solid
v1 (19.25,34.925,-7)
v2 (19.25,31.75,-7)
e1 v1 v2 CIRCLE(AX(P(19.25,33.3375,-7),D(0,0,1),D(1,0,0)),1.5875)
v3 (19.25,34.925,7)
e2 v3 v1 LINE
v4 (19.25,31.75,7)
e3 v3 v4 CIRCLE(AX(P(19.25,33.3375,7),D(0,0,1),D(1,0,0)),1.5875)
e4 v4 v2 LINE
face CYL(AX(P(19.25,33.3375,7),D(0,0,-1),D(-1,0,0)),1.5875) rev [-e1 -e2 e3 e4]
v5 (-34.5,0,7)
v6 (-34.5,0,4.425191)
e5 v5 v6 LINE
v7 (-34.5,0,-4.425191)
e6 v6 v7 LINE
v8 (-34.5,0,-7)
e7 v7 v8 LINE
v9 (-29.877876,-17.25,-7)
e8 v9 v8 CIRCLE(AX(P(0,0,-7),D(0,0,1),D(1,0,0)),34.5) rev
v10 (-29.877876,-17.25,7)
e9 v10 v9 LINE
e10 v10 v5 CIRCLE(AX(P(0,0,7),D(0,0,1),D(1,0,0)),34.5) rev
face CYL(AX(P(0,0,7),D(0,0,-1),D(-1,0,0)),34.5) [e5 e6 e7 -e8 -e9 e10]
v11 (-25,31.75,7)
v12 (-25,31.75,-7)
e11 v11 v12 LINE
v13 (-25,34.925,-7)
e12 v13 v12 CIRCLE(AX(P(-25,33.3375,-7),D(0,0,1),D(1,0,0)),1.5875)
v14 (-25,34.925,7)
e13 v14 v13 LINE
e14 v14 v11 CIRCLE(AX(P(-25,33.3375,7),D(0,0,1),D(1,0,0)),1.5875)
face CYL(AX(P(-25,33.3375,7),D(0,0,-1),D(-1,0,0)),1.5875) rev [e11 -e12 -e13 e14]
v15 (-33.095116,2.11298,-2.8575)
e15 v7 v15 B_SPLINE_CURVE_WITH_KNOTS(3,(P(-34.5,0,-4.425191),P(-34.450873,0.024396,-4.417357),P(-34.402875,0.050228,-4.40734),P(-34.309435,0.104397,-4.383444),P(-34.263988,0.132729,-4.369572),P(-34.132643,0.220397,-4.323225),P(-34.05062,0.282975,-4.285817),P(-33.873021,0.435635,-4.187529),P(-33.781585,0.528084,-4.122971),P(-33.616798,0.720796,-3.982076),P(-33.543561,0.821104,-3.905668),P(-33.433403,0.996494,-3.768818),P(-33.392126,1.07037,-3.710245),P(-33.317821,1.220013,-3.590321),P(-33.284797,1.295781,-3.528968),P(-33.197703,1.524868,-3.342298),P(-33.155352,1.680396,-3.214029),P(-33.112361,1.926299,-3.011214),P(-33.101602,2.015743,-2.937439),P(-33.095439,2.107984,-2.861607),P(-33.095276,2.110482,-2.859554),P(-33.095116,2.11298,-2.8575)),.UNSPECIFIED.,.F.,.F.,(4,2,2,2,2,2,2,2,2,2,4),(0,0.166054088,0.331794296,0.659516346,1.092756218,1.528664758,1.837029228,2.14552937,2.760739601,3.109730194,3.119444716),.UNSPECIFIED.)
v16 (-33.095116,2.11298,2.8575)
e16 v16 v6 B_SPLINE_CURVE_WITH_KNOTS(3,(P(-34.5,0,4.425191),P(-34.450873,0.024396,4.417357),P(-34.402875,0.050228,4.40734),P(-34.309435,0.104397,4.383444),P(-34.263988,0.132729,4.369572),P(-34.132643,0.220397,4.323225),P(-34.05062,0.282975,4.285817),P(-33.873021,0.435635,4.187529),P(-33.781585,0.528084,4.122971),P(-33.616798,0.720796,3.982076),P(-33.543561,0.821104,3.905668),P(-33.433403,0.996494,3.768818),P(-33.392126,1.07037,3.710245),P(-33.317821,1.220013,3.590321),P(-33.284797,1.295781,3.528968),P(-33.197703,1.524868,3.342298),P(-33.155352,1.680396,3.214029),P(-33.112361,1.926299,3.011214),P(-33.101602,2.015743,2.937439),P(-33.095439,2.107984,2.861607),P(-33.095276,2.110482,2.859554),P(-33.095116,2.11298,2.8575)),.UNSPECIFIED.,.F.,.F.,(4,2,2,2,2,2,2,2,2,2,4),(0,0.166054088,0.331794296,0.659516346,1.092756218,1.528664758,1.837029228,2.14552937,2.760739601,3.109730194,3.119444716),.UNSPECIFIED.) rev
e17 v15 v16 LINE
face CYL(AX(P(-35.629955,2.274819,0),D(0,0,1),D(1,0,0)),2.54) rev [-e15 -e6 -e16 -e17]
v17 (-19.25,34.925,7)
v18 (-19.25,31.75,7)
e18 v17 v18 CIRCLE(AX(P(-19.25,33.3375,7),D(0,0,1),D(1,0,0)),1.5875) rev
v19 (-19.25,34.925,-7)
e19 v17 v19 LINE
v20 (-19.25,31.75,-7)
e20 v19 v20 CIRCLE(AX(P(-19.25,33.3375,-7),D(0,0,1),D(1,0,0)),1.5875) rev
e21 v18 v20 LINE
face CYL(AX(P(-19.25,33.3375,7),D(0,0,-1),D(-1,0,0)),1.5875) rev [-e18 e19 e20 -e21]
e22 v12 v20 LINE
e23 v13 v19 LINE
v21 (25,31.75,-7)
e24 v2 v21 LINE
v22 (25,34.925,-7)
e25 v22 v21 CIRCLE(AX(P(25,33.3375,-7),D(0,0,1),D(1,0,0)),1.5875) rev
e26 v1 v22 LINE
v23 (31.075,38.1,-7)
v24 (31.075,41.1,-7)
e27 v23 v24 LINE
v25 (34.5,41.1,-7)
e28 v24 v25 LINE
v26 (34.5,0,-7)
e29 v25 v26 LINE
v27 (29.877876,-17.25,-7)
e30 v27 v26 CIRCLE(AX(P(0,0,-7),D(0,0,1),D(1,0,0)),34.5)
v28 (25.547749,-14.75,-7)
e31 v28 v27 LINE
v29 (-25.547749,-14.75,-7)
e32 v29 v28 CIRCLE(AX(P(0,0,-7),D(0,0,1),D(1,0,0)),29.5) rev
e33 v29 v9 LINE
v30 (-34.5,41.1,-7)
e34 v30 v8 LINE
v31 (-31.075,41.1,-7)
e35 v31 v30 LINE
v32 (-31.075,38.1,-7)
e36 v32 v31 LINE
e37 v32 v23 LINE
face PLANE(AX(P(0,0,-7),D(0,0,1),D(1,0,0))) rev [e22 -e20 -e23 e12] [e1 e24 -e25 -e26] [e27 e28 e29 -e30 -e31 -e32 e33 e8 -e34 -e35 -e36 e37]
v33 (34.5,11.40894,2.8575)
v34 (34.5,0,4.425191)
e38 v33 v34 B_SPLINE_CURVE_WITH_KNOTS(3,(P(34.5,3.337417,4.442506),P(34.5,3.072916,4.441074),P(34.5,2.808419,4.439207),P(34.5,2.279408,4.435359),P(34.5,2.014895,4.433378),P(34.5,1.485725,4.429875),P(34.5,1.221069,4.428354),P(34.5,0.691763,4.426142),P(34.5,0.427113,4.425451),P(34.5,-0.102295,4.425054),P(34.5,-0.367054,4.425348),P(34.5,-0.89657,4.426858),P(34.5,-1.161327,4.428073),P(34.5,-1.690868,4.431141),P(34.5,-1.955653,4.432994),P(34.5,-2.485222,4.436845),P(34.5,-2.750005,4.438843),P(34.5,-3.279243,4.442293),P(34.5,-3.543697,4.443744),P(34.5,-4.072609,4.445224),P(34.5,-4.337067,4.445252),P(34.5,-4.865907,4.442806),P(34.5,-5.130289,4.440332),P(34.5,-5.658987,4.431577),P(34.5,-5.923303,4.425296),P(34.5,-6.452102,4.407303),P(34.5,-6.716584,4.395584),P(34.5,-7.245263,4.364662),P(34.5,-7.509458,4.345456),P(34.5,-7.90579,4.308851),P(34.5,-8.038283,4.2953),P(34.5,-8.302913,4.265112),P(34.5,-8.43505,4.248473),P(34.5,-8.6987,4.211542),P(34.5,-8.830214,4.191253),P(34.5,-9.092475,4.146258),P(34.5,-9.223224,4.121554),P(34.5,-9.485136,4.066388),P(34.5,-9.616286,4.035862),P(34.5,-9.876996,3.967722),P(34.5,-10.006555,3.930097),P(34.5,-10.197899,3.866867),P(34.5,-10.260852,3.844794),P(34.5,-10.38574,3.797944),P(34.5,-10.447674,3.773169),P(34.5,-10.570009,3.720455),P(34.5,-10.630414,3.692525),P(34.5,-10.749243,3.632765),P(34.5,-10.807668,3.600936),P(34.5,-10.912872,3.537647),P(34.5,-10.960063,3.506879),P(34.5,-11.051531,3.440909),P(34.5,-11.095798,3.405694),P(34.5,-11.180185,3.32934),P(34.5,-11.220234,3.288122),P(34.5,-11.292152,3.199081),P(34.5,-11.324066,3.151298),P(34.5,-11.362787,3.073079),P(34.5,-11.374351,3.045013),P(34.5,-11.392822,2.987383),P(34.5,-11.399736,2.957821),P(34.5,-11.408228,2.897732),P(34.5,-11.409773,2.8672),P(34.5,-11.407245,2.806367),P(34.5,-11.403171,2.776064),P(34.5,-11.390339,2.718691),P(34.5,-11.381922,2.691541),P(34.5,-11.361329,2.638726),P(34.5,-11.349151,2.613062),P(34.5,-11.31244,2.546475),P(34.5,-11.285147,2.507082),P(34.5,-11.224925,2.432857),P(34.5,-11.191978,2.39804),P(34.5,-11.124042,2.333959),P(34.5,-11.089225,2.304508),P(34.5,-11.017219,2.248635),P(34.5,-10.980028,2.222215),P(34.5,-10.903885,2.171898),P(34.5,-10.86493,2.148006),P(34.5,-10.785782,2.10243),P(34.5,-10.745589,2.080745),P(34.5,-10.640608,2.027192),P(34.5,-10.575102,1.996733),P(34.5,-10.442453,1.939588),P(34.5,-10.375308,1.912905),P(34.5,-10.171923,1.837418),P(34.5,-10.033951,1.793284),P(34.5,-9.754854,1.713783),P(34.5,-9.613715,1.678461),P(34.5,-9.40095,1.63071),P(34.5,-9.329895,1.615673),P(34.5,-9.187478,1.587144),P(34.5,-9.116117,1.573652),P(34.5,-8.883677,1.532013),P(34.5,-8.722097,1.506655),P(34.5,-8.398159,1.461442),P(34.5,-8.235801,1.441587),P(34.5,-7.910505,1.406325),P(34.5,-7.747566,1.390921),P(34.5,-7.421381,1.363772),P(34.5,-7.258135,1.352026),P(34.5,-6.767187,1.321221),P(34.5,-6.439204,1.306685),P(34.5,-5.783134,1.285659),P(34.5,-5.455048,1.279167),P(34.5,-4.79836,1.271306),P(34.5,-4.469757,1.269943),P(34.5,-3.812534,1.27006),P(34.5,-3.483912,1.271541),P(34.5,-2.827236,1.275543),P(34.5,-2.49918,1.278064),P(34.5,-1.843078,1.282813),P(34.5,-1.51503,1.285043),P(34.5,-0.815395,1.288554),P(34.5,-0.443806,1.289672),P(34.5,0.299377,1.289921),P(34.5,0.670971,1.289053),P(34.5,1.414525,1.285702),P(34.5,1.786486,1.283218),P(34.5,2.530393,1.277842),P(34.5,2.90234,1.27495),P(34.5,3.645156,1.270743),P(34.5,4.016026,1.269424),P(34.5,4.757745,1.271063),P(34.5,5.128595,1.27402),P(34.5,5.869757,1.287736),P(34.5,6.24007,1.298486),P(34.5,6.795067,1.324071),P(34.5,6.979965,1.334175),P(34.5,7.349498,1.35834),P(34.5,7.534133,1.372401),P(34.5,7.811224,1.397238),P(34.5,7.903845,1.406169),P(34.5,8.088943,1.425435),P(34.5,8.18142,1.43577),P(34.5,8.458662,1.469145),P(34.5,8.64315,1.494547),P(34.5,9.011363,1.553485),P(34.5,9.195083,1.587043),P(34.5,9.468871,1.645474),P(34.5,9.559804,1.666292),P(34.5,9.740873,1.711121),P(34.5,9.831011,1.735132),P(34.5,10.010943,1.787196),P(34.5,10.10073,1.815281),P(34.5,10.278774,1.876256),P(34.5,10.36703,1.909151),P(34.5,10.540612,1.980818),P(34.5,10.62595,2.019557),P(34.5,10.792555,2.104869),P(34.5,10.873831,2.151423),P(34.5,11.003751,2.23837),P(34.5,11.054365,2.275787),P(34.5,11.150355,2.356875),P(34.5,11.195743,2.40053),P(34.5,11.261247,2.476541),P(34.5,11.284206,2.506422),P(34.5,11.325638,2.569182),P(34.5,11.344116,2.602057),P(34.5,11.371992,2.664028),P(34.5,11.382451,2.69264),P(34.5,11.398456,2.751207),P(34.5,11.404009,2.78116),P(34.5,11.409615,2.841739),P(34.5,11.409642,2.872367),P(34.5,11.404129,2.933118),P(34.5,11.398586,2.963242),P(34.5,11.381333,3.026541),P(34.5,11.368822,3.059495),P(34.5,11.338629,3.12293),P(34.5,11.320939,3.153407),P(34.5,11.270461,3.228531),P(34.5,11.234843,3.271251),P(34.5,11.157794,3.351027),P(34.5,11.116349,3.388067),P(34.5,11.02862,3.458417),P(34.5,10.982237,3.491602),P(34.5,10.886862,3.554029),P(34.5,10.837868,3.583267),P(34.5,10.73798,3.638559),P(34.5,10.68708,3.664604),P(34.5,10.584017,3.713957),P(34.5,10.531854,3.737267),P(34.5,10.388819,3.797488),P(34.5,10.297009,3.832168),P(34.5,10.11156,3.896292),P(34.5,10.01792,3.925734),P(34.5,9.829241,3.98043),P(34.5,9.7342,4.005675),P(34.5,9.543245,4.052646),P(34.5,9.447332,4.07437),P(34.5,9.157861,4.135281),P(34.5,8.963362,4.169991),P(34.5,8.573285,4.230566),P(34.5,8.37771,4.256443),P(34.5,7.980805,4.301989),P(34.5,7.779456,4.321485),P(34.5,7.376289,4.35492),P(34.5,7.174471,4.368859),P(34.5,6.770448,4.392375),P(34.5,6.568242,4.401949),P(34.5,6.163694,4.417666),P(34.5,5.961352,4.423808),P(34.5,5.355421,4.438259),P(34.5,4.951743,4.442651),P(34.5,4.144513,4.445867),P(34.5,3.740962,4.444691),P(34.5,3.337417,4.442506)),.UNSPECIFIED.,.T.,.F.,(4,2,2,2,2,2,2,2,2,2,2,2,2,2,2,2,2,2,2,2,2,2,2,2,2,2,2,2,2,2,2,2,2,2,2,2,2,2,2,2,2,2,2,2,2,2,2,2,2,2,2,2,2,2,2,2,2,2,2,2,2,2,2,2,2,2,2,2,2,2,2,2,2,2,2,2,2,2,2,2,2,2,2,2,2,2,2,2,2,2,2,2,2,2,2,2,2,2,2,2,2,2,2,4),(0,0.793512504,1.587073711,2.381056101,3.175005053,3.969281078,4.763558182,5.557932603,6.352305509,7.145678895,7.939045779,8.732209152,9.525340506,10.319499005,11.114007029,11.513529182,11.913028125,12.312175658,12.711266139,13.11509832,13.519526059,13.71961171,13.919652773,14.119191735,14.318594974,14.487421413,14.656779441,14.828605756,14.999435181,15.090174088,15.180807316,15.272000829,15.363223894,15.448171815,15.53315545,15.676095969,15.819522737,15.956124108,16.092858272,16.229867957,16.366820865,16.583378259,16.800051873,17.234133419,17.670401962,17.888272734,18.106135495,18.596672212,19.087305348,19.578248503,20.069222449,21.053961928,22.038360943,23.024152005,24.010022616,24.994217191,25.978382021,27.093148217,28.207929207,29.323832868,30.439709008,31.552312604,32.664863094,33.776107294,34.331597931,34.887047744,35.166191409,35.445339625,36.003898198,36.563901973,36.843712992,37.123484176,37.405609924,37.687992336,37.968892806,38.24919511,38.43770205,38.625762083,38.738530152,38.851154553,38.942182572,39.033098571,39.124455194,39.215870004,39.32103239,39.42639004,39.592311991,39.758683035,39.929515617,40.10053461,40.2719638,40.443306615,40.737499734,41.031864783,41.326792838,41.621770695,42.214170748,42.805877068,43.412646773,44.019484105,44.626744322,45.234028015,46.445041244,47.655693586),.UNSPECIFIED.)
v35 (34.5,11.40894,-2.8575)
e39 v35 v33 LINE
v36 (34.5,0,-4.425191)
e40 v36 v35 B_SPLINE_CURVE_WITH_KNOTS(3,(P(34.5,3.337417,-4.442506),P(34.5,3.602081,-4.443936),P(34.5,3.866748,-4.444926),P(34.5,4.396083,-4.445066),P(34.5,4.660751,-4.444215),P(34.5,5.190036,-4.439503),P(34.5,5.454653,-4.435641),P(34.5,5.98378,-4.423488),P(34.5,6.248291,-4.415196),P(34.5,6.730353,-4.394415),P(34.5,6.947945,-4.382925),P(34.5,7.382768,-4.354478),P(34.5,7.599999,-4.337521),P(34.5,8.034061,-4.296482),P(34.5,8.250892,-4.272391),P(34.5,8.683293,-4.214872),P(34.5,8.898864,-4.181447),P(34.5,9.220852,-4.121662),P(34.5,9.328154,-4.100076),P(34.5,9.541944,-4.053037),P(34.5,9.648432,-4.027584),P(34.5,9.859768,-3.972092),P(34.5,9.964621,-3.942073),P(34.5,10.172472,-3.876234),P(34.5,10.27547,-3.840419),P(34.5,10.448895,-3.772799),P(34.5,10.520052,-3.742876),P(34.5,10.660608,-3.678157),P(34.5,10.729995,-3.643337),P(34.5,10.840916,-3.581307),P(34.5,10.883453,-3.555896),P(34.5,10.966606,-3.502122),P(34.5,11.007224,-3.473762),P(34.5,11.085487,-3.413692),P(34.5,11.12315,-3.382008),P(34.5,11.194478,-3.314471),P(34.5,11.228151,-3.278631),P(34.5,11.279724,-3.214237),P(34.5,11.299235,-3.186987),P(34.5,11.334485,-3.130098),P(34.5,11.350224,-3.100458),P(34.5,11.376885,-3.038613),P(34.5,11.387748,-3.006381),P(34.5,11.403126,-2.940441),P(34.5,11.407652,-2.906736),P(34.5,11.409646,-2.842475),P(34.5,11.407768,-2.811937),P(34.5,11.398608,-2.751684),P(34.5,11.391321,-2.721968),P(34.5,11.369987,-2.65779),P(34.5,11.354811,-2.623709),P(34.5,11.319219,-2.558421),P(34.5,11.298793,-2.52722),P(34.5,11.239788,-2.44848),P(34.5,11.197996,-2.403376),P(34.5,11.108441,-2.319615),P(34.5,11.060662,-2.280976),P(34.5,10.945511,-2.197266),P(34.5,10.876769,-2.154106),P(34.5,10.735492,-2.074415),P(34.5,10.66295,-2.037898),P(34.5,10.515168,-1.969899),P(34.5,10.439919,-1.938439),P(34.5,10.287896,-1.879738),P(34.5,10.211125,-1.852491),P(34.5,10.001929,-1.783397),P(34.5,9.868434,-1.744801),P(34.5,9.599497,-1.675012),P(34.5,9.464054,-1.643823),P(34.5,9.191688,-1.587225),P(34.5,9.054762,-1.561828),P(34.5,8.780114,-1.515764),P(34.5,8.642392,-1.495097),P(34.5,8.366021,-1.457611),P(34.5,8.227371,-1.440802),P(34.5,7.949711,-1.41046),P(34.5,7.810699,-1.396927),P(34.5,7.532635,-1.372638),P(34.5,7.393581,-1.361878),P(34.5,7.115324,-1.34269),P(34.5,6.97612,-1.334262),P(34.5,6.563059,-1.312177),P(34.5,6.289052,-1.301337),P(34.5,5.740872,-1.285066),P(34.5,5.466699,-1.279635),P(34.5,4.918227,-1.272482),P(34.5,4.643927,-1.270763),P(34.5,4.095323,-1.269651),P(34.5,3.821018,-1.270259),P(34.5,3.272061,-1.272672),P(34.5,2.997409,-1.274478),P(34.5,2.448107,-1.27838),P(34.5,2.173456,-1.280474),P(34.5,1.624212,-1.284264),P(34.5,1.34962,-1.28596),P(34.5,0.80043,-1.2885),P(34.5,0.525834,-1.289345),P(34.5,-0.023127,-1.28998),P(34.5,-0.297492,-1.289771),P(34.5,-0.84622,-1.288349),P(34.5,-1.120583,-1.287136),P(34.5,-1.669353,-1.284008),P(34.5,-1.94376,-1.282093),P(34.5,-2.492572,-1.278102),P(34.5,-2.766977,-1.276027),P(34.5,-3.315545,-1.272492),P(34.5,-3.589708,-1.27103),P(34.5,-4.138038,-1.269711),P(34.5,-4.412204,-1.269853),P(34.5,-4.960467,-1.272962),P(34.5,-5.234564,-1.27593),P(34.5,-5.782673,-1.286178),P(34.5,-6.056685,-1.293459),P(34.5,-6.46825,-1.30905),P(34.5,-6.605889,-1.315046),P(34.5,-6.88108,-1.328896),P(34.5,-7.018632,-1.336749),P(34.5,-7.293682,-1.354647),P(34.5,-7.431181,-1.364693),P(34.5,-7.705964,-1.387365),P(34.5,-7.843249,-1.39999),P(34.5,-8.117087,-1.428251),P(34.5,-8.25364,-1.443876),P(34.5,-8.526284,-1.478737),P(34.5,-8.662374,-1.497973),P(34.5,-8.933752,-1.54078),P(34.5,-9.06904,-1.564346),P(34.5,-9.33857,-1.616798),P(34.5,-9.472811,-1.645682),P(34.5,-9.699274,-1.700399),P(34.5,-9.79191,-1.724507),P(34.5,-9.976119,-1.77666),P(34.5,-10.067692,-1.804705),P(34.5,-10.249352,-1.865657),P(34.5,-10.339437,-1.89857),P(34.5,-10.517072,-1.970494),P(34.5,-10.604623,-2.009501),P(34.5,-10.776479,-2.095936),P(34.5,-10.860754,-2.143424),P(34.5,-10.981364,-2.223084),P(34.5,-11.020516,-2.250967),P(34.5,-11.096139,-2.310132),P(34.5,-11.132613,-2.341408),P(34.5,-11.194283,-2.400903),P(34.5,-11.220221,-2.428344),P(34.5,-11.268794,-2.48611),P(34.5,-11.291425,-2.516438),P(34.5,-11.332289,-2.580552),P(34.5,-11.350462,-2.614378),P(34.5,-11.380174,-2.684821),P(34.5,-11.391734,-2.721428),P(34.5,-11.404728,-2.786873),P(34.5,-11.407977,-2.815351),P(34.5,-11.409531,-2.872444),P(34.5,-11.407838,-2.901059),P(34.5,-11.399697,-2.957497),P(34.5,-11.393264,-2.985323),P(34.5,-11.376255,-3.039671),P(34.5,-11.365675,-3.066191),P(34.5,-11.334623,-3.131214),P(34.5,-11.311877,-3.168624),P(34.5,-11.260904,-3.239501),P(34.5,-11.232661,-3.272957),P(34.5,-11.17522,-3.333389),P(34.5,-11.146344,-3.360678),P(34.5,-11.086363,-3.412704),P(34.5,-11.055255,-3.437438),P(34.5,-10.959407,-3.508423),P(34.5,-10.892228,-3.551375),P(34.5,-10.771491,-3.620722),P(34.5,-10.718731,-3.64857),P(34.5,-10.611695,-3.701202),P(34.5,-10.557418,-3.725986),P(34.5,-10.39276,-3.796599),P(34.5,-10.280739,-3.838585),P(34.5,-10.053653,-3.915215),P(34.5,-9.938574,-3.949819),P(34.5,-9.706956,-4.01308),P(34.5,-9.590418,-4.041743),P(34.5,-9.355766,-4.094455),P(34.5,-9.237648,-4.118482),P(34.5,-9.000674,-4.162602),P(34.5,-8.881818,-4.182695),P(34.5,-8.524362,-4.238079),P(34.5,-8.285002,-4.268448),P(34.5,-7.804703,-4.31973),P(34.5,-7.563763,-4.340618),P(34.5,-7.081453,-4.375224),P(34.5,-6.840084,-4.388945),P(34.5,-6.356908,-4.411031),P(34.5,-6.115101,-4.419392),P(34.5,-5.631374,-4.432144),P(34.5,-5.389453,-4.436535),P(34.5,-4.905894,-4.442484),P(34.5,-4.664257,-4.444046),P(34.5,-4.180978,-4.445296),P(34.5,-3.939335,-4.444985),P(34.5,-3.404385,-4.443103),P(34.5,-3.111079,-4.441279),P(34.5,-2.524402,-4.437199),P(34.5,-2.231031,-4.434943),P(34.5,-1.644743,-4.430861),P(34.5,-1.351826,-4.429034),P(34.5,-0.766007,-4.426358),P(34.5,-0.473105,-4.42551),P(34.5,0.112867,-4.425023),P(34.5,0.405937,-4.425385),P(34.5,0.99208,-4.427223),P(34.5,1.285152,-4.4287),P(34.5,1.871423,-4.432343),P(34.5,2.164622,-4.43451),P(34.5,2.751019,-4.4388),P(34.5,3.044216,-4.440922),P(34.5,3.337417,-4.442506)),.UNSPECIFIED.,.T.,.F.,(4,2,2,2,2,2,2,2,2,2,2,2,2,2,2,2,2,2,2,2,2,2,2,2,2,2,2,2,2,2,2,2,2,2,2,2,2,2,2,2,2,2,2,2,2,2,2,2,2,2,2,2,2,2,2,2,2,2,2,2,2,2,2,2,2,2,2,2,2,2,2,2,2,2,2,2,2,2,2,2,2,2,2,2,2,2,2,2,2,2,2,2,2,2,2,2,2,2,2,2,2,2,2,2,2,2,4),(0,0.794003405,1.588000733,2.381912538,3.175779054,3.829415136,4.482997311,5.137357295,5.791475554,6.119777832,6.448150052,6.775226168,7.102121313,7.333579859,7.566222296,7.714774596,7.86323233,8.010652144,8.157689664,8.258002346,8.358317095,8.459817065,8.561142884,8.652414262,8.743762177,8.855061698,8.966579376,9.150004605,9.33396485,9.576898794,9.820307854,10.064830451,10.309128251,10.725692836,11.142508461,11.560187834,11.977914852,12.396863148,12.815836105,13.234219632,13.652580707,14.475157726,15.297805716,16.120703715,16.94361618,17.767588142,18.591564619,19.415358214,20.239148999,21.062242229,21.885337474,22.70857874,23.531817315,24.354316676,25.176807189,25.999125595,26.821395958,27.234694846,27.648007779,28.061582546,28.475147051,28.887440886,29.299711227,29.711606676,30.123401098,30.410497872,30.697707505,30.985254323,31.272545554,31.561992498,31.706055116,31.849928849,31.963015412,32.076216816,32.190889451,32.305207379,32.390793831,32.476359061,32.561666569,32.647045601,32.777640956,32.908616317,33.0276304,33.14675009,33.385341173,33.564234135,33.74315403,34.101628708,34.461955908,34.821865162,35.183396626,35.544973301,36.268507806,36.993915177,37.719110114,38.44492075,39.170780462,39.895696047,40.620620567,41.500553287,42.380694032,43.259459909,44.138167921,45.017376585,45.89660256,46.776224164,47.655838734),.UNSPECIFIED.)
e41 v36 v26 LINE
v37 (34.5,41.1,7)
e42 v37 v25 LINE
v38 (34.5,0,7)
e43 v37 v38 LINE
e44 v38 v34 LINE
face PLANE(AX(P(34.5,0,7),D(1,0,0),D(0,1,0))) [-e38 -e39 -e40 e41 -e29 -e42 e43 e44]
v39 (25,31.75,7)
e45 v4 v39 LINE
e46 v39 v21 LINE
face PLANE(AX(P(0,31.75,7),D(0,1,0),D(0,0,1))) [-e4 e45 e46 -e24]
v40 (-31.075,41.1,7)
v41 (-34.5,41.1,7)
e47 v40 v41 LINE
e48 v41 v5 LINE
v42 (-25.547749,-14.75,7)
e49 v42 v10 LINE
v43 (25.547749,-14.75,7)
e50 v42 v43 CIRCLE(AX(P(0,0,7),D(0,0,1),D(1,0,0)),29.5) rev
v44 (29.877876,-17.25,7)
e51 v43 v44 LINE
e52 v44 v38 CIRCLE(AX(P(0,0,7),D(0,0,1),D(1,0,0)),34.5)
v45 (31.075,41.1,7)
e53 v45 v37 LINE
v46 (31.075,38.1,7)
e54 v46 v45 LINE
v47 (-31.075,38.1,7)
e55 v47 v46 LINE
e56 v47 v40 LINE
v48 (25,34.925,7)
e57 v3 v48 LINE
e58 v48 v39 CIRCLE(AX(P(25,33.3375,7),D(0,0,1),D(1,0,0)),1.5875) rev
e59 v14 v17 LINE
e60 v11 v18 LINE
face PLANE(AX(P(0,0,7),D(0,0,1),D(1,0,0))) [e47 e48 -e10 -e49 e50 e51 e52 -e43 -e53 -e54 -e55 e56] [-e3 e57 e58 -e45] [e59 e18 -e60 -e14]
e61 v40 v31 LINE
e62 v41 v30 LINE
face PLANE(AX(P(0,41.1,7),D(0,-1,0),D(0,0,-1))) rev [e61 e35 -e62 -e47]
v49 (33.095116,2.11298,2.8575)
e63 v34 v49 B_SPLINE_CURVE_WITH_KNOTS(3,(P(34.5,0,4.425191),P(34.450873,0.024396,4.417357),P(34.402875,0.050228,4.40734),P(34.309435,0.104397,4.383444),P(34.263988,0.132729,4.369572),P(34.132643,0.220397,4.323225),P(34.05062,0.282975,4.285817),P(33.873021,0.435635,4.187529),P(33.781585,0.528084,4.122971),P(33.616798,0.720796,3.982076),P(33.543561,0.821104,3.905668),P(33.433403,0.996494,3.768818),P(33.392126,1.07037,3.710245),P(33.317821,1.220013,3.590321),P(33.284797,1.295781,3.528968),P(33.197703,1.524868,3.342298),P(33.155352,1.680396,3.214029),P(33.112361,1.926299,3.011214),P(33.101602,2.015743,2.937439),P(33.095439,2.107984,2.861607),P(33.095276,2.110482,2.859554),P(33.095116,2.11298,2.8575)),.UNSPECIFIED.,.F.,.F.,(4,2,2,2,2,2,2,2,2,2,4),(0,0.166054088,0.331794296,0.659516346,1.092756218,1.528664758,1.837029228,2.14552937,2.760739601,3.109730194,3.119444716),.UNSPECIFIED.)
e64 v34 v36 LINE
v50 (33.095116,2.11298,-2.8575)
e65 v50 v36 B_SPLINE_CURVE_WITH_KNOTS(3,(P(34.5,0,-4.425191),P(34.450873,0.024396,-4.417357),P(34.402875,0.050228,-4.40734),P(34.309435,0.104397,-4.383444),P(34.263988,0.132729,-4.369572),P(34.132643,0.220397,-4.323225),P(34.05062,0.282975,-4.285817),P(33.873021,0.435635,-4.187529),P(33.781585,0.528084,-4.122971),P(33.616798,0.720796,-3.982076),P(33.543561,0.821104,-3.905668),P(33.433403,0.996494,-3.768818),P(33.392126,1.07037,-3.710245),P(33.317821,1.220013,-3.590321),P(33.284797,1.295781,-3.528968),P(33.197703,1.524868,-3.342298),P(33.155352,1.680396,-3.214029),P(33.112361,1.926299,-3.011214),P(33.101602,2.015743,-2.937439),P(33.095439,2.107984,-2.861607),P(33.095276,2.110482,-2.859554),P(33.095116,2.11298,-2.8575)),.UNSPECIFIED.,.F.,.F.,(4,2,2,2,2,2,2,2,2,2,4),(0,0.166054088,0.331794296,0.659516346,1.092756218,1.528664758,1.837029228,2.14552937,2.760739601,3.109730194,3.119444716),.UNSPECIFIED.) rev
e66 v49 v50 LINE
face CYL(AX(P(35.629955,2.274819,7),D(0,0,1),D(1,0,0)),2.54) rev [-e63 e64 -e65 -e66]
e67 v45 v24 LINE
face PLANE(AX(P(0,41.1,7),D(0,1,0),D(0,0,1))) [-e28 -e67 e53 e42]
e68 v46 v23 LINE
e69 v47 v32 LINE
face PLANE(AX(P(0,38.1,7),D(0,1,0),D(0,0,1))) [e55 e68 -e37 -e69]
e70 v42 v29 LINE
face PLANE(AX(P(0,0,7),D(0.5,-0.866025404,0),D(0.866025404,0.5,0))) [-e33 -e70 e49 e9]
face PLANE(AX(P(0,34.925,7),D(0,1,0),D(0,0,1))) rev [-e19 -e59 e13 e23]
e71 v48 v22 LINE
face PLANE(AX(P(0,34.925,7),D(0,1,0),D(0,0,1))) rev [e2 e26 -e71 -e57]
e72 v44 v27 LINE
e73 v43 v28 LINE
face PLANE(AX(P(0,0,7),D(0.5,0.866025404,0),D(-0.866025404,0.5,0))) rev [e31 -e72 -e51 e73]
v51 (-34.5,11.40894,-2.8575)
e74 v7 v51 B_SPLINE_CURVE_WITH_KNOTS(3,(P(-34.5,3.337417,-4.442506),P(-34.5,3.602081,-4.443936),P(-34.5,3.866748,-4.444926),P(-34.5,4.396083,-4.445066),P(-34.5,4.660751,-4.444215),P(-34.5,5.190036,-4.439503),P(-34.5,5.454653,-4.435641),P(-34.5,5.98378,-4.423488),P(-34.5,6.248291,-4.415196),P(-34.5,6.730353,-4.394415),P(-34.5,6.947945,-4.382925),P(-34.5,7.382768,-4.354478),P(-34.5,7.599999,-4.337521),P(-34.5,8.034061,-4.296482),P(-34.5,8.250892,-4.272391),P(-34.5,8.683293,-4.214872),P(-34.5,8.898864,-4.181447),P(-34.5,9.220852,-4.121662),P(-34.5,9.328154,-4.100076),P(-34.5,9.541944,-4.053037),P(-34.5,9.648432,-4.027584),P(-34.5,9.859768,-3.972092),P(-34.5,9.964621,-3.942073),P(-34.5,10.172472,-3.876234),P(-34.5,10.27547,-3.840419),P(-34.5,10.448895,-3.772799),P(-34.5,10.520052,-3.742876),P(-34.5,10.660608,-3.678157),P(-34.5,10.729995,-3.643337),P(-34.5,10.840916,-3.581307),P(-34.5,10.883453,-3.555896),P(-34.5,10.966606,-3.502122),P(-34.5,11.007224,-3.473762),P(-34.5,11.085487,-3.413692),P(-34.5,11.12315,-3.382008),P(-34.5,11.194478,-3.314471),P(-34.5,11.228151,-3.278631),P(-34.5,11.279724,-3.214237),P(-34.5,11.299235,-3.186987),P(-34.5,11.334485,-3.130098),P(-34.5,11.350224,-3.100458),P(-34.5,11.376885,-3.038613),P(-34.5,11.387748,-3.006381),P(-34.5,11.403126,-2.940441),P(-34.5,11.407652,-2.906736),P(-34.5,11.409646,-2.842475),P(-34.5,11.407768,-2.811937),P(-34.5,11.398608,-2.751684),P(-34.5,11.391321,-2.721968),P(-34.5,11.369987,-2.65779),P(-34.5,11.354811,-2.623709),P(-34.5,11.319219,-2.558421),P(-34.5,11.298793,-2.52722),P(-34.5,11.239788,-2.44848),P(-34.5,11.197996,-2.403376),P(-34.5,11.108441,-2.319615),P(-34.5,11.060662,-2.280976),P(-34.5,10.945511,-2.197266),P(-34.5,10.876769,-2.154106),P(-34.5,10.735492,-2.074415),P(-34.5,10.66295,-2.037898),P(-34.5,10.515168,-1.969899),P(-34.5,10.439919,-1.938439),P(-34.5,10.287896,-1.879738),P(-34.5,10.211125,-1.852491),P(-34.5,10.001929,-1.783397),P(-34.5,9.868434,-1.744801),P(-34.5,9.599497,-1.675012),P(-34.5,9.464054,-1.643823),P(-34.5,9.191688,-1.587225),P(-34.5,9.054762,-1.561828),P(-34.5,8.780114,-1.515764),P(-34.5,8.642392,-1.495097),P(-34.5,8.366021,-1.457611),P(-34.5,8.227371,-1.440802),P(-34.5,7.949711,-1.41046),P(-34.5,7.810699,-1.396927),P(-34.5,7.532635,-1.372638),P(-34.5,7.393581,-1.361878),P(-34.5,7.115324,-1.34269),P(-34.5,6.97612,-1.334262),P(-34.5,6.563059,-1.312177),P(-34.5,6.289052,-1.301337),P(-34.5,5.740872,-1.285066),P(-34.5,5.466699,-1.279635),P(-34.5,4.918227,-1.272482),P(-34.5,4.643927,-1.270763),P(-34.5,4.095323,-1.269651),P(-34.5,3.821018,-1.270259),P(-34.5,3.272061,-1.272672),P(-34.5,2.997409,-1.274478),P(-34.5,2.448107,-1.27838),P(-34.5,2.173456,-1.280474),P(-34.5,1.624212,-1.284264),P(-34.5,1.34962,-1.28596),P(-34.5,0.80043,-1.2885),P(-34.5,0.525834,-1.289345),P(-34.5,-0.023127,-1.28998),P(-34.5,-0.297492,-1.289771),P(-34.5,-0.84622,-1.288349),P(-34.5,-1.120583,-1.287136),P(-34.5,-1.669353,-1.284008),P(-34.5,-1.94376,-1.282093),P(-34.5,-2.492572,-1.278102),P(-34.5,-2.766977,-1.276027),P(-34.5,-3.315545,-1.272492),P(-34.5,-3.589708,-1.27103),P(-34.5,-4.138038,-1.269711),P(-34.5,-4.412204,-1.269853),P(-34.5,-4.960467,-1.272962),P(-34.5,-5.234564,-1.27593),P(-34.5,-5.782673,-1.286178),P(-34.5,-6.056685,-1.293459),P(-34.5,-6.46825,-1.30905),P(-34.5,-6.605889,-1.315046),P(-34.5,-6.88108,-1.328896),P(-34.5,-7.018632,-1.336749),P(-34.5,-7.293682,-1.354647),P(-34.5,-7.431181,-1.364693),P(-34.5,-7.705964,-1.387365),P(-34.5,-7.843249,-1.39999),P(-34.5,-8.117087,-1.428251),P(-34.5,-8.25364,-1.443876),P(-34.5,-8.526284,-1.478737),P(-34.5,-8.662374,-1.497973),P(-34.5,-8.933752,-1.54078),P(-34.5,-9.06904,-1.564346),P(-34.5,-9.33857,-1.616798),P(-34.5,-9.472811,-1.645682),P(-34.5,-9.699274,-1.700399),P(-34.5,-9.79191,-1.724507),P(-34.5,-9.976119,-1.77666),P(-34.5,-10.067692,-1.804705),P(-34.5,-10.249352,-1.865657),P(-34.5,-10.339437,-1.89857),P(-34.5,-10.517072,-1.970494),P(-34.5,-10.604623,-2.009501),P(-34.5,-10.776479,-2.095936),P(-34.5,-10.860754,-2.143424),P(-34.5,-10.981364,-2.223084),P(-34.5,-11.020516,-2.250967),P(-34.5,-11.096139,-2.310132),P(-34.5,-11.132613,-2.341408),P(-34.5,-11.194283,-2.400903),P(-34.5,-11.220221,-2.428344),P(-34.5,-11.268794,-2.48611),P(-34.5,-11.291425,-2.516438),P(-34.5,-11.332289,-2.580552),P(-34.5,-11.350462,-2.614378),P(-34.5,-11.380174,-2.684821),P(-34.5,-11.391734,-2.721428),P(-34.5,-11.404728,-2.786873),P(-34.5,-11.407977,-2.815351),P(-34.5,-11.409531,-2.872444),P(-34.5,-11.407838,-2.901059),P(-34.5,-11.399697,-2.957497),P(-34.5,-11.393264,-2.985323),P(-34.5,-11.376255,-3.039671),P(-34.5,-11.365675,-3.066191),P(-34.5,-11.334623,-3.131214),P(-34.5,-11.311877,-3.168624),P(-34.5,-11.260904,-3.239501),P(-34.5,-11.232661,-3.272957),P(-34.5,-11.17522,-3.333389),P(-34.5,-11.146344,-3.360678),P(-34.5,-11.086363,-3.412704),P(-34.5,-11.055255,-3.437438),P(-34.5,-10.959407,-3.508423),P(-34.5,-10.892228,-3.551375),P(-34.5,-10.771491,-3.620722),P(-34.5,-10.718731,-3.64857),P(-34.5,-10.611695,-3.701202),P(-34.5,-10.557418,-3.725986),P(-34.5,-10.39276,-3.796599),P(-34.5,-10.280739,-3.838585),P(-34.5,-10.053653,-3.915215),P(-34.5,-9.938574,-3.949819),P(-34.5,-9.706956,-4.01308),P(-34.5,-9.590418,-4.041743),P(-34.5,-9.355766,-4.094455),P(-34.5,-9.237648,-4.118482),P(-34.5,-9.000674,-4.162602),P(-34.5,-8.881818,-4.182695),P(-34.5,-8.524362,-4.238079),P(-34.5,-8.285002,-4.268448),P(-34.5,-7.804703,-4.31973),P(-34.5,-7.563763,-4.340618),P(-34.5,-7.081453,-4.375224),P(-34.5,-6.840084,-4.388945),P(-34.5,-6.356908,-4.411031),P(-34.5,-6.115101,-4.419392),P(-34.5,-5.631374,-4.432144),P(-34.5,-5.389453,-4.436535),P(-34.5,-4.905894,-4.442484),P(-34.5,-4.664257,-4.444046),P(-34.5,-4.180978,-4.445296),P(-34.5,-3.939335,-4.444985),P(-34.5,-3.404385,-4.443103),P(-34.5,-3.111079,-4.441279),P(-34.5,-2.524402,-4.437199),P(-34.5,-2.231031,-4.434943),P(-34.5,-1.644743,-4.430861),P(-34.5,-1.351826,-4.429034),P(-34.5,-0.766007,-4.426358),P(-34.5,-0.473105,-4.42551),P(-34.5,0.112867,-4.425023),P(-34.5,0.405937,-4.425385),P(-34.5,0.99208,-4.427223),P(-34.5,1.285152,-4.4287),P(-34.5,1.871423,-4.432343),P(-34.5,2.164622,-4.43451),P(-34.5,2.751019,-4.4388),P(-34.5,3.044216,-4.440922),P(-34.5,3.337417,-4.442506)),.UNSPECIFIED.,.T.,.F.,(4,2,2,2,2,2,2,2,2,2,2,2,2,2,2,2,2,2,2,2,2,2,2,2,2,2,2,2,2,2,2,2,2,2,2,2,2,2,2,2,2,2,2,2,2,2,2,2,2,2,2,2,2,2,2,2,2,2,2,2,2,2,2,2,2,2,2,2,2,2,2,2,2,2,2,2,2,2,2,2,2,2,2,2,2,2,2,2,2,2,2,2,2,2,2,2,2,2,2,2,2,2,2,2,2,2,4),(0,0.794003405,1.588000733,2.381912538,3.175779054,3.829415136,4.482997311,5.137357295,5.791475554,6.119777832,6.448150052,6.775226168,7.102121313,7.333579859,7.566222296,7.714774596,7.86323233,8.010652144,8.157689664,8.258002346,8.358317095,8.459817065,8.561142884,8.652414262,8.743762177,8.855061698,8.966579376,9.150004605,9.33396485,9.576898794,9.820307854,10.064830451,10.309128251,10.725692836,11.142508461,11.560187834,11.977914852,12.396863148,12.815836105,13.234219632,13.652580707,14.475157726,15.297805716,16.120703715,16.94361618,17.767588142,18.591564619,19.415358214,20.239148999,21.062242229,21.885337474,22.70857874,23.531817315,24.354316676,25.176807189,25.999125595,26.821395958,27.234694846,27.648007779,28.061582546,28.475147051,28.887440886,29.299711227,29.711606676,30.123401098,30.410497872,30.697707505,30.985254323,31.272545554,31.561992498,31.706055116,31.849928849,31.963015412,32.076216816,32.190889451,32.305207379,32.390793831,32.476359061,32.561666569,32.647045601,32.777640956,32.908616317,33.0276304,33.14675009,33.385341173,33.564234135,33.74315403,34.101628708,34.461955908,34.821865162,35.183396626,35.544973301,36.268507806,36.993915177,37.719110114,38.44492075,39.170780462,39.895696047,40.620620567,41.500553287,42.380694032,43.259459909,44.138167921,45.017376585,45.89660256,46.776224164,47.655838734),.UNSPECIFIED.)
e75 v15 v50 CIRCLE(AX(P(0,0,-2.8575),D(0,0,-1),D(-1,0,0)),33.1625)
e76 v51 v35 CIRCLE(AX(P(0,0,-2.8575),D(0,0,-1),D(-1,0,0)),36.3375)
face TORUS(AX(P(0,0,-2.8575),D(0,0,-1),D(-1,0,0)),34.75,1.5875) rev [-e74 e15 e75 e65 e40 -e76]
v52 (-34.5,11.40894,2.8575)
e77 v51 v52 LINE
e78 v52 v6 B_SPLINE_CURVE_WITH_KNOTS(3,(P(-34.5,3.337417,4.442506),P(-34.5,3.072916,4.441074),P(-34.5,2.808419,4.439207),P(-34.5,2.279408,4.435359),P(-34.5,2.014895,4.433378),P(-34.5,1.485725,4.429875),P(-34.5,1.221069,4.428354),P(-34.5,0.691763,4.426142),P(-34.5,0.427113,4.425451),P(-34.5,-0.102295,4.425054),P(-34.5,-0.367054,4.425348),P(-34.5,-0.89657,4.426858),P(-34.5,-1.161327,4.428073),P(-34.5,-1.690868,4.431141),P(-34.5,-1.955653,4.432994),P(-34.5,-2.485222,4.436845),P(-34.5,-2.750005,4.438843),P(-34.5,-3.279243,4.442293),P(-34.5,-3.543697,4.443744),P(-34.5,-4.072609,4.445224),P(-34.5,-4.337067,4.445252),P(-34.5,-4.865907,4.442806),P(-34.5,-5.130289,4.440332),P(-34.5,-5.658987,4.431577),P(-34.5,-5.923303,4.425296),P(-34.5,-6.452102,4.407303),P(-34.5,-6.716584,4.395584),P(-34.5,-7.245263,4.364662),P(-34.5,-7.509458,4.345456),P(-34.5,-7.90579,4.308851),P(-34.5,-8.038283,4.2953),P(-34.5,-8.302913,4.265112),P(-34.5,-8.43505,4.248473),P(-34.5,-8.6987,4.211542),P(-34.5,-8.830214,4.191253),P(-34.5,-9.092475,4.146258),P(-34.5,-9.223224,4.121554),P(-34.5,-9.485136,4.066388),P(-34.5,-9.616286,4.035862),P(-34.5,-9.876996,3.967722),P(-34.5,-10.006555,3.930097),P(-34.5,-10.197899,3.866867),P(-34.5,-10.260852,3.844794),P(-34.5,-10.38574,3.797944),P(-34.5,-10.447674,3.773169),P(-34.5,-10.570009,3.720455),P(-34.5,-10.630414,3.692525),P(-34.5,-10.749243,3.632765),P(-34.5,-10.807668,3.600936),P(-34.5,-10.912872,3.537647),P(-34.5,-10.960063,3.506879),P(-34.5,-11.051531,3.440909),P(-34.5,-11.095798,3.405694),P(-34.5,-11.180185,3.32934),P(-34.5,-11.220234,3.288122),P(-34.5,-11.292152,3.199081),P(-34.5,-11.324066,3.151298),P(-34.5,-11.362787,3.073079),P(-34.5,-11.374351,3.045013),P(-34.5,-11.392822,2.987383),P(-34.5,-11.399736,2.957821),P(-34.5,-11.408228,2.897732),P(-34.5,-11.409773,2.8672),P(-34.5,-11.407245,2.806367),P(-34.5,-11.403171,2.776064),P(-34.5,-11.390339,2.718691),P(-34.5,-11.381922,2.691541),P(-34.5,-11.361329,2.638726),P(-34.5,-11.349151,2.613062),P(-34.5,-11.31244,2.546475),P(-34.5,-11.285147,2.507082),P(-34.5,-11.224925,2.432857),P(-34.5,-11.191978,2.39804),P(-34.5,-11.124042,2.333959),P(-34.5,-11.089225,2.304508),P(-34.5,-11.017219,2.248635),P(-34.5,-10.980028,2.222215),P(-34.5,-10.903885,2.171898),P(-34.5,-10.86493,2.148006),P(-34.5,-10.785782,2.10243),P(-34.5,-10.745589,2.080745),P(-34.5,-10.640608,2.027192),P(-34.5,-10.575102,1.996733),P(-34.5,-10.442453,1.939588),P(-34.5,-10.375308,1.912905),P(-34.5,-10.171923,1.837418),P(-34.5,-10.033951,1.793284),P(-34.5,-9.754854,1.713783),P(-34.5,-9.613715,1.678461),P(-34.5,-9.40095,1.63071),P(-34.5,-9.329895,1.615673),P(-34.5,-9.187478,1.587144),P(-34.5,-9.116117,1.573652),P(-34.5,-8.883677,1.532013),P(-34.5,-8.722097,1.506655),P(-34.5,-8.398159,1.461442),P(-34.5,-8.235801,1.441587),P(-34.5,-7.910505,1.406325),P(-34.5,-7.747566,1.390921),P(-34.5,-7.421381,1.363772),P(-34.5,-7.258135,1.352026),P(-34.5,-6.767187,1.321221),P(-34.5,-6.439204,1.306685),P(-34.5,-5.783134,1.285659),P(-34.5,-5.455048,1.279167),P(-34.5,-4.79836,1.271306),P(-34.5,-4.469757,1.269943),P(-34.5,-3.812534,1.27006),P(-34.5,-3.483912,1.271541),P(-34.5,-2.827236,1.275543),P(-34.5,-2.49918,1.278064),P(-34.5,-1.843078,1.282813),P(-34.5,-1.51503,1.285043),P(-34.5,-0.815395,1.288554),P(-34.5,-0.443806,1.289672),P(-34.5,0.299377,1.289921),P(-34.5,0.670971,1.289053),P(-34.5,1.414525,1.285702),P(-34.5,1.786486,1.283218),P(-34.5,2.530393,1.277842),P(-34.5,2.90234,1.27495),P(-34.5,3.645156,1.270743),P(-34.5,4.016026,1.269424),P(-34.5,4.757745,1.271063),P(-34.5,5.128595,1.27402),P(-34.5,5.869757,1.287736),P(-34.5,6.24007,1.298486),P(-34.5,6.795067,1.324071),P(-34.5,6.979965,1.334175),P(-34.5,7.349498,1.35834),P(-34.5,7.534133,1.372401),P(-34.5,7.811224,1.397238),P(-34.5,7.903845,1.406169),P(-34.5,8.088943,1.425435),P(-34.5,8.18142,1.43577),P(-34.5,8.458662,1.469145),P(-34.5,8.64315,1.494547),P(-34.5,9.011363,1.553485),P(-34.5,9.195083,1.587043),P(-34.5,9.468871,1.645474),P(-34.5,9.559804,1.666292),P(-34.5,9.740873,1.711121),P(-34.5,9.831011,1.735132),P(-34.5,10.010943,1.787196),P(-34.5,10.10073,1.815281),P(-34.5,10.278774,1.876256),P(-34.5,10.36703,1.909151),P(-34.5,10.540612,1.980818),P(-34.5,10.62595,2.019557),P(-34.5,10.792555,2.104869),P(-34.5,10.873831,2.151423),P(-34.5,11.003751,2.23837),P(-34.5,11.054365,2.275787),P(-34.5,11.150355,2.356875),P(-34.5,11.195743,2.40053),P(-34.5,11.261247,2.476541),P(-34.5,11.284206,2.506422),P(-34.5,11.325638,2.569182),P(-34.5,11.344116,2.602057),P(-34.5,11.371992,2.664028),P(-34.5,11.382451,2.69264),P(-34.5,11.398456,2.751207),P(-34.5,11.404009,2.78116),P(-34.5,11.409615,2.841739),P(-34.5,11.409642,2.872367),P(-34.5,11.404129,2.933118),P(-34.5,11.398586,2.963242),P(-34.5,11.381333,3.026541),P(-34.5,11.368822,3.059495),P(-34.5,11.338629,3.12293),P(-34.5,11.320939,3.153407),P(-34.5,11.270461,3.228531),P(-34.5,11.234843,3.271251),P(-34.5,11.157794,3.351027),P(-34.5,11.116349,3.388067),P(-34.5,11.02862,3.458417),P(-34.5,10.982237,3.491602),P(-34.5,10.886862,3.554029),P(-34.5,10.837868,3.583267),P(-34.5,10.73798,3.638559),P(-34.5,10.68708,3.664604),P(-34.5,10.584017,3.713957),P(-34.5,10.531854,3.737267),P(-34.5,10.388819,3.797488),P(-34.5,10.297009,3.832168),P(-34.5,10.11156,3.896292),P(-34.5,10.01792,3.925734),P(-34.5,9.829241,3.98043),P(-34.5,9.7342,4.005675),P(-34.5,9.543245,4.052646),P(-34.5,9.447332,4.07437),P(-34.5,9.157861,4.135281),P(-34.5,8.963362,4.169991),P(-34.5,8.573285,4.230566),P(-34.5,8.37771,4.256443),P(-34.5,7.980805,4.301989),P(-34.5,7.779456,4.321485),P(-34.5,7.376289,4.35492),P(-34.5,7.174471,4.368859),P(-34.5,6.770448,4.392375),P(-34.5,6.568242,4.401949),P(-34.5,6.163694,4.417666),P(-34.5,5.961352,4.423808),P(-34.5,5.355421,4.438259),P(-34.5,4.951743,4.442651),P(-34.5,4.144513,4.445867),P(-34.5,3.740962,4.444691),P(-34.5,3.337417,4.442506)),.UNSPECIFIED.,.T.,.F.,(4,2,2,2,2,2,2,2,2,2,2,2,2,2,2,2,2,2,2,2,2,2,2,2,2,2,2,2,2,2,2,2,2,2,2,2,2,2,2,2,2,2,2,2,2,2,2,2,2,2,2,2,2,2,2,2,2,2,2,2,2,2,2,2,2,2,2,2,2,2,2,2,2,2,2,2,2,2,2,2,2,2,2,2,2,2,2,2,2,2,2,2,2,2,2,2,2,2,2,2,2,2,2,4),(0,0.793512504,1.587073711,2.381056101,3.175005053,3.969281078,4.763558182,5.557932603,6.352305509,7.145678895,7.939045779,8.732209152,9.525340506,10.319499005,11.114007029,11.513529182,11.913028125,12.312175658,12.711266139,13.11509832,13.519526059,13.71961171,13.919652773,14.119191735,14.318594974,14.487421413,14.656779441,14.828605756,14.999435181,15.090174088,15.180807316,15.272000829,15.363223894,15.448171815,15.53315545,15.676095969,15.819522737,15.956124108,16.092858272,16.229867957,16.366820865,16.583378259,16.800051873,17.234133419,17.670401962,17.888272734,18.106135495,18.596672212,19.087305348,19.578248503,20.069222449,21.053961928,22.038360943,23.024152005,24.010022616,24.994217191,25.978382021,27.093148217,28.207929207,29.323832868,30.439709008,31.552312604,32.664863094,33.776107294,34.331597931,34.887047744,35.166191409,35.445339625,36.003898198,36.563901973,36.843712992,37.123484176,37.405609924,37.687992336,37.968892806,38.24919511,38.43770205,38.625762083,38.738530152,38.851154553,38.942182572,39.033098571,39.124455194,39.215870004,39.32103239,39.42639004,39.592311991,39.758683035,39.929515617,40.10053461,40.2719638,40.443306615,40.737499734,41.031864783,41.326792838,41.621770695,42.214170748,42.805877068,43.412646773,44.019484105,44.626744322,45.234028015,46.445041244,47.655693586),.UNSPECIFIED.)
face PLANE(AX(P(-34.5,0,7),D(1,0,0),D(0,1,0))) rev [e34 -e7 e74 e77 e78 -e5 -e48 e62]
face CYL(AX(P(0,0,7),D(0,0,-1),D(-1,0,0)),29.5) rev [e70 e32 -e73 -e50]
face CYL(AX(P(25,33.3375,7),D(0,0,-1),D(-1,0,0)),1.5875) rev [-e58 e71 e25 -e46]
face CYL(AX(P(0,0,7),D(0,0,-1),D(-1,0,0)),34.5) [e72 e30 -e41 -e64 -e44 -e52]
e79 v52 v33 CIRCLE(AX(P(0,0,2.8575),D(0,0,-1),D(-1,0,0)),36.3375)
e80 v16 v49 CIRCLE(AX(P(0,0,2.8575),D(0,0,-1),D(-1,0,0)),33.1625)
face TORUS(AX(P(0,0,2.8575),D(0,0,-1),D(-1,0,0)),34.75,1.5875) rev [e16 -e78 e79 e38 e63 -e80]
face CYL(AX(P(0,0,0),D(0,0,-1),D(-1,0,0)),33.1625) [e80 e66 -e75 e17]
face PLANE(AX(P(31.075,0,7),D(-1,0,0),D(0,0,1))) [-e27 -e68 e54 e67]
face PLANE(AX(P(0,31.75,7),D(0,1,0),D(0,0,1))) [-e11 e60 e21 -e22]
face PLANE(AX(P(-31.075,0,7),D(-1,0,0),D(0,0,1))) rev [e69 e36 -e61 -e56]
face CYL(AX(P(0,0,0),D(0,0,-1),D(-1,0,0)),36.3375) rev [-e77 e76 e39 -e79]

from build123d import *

# Parameters (mm, degrees)
BOSS_EXTRUDE2_DEPTH      = 7
CORTAR_REVOLUCI_N1_ANGLE = 180
REDONDEO1_START          = -5
REDONDEO1_DEPTH          = 10


with BuildPart() as part:
    # Sketch1 → Boss-Extrude2 (new, symmetric)
    with BuildSketch(Plane.XY):
        with BuildLine():
            Line((25.547749412, -14.75), (29.877876431, -17.25))
            ThreePointArc((29.877876431, -17.25), (33.324441007, -8.929257056), (34.5, 0))
            Line((34.5, 0), (34.5, 41.1))
            Line((34.5, 41.1), (31.075, 41.1))
            Line((31.075, 41.1), (31.075, 38.1))
            Line((31.075, 38.1), (-31.075, 38.1))
            Line((-31.075, 38.1), (-31.075, 41.1))
            Line((-31.075, 41.1), (-34.5, 41.1))
            Line((-34.5, 41.1), (-34.5, 0))
            ThreePointArc((-34.5, 0), (-33.324441007, -8.929257056), (-29.877876431, -17.25))
            Line((-29.877876431, -17.25), (-25.547749412, -14.75))
            ThreePointArc((-25.547749412, -14.75), (0, 29.5), (25.547749412, -14.75))
        make_face()
        with BuildLine():
            Line((-25, 34.925), (-19.25, 34.925))
            ThreePointArc((-19.25, 34.925), (-17.6625, 33.3375), (-19.25, 31.75))
            Line((-19.25, 31.75), (-25, 31.75))
            ThreePointArc((-25, 31.75), (-26.5875, 33.3375), (-25, 34.925))
        make_face(mode=Mode.SUBTRACT)
        with BuildLine():
            Line((19.25, 34.925), (25, 34.925))
            ThreePointArc((25, 34.925), (26.5875, 33.3375), (25, 31.75))
            Line((25, 31.75), (19.25, 31.75))
            ThreePointArc((19.25, 31.75), (17.6625, 33.3375), (19.25, 34.925))
        make_face(mode=Mode.SUBTRACT)
    extrude(amount=BOSS_EXTRUDE2_DEPTH, both=True)

    # Croquis1 → Cortar-Revolución1 (revolve, symmetric, cut)
    with BuildSketch(Plane(origin=(0, 0, 0), x_dir=(0, 0, -1), z_dir=(1, 0, 0))) as cortar_revoluci_n1_sk:
        with BuildLine():
            Line((-2.8575, 36.3375), (2.8575, 36.3375))
            ThreePointArc((2.8575, 36.3375), (4.445, 34.75), (2.8575, 33.1625))
            Line((2.8575, 33.1625), (-2.8575, 33.1625))
            ThreePointArc((-2.8575, 33.1625), (-4.445, 34.75), (-2.8575, 36.3375))
        make_face()
    revolve(axis=Axis((0, 0, 0), (0, 0, 1)), revolution_arc=CORTAR_REVOLUCI_N1_ANGLE / 2, mode=Mode.SUBTRACT)
    revolve(cortar_revoluci_n1_sk.sketch, axis=Axis((0, 0, 0), (0, 0, -1)), revolution_arc=CORTAR_REVOLUCI_N1_ANGLE / 2, mode=Mode.SUBTRACT)

    # Redondeo1: read off the stored shape, not the designer's step
    # Redondeo1 outline → Redondeo1 (add)
    with BuildSketch(Plane.XY.offset(REDONDEO1_START)):
        with BuildLine():
            ThreePointArc((34.5, 0), (33.514807302, 0.868494137), (33.095116255, 2.112980435))
            ThreePointArc((33.095116255, 2.112980435), (33.145649783, 1.057027304), (33.1625, 0))
            Line((33.1625, 0), (34.5, 0))
        make_face()
        with BuildLine():
            ThreePointArc((-33.095116255, 2.112980435), (-33.514807302, 0.868494137), (-34.5, 0))
            Line((-34.5, 0), (-33.1625, 0))
            ThreePointArc((-33.1625, 0), (-33.145649783, 1.057027304), (-33.095116255, 2.112980435))
        make_face()
    extrude(amount=REDONDEO1_DEPTH)


solid = part.part
